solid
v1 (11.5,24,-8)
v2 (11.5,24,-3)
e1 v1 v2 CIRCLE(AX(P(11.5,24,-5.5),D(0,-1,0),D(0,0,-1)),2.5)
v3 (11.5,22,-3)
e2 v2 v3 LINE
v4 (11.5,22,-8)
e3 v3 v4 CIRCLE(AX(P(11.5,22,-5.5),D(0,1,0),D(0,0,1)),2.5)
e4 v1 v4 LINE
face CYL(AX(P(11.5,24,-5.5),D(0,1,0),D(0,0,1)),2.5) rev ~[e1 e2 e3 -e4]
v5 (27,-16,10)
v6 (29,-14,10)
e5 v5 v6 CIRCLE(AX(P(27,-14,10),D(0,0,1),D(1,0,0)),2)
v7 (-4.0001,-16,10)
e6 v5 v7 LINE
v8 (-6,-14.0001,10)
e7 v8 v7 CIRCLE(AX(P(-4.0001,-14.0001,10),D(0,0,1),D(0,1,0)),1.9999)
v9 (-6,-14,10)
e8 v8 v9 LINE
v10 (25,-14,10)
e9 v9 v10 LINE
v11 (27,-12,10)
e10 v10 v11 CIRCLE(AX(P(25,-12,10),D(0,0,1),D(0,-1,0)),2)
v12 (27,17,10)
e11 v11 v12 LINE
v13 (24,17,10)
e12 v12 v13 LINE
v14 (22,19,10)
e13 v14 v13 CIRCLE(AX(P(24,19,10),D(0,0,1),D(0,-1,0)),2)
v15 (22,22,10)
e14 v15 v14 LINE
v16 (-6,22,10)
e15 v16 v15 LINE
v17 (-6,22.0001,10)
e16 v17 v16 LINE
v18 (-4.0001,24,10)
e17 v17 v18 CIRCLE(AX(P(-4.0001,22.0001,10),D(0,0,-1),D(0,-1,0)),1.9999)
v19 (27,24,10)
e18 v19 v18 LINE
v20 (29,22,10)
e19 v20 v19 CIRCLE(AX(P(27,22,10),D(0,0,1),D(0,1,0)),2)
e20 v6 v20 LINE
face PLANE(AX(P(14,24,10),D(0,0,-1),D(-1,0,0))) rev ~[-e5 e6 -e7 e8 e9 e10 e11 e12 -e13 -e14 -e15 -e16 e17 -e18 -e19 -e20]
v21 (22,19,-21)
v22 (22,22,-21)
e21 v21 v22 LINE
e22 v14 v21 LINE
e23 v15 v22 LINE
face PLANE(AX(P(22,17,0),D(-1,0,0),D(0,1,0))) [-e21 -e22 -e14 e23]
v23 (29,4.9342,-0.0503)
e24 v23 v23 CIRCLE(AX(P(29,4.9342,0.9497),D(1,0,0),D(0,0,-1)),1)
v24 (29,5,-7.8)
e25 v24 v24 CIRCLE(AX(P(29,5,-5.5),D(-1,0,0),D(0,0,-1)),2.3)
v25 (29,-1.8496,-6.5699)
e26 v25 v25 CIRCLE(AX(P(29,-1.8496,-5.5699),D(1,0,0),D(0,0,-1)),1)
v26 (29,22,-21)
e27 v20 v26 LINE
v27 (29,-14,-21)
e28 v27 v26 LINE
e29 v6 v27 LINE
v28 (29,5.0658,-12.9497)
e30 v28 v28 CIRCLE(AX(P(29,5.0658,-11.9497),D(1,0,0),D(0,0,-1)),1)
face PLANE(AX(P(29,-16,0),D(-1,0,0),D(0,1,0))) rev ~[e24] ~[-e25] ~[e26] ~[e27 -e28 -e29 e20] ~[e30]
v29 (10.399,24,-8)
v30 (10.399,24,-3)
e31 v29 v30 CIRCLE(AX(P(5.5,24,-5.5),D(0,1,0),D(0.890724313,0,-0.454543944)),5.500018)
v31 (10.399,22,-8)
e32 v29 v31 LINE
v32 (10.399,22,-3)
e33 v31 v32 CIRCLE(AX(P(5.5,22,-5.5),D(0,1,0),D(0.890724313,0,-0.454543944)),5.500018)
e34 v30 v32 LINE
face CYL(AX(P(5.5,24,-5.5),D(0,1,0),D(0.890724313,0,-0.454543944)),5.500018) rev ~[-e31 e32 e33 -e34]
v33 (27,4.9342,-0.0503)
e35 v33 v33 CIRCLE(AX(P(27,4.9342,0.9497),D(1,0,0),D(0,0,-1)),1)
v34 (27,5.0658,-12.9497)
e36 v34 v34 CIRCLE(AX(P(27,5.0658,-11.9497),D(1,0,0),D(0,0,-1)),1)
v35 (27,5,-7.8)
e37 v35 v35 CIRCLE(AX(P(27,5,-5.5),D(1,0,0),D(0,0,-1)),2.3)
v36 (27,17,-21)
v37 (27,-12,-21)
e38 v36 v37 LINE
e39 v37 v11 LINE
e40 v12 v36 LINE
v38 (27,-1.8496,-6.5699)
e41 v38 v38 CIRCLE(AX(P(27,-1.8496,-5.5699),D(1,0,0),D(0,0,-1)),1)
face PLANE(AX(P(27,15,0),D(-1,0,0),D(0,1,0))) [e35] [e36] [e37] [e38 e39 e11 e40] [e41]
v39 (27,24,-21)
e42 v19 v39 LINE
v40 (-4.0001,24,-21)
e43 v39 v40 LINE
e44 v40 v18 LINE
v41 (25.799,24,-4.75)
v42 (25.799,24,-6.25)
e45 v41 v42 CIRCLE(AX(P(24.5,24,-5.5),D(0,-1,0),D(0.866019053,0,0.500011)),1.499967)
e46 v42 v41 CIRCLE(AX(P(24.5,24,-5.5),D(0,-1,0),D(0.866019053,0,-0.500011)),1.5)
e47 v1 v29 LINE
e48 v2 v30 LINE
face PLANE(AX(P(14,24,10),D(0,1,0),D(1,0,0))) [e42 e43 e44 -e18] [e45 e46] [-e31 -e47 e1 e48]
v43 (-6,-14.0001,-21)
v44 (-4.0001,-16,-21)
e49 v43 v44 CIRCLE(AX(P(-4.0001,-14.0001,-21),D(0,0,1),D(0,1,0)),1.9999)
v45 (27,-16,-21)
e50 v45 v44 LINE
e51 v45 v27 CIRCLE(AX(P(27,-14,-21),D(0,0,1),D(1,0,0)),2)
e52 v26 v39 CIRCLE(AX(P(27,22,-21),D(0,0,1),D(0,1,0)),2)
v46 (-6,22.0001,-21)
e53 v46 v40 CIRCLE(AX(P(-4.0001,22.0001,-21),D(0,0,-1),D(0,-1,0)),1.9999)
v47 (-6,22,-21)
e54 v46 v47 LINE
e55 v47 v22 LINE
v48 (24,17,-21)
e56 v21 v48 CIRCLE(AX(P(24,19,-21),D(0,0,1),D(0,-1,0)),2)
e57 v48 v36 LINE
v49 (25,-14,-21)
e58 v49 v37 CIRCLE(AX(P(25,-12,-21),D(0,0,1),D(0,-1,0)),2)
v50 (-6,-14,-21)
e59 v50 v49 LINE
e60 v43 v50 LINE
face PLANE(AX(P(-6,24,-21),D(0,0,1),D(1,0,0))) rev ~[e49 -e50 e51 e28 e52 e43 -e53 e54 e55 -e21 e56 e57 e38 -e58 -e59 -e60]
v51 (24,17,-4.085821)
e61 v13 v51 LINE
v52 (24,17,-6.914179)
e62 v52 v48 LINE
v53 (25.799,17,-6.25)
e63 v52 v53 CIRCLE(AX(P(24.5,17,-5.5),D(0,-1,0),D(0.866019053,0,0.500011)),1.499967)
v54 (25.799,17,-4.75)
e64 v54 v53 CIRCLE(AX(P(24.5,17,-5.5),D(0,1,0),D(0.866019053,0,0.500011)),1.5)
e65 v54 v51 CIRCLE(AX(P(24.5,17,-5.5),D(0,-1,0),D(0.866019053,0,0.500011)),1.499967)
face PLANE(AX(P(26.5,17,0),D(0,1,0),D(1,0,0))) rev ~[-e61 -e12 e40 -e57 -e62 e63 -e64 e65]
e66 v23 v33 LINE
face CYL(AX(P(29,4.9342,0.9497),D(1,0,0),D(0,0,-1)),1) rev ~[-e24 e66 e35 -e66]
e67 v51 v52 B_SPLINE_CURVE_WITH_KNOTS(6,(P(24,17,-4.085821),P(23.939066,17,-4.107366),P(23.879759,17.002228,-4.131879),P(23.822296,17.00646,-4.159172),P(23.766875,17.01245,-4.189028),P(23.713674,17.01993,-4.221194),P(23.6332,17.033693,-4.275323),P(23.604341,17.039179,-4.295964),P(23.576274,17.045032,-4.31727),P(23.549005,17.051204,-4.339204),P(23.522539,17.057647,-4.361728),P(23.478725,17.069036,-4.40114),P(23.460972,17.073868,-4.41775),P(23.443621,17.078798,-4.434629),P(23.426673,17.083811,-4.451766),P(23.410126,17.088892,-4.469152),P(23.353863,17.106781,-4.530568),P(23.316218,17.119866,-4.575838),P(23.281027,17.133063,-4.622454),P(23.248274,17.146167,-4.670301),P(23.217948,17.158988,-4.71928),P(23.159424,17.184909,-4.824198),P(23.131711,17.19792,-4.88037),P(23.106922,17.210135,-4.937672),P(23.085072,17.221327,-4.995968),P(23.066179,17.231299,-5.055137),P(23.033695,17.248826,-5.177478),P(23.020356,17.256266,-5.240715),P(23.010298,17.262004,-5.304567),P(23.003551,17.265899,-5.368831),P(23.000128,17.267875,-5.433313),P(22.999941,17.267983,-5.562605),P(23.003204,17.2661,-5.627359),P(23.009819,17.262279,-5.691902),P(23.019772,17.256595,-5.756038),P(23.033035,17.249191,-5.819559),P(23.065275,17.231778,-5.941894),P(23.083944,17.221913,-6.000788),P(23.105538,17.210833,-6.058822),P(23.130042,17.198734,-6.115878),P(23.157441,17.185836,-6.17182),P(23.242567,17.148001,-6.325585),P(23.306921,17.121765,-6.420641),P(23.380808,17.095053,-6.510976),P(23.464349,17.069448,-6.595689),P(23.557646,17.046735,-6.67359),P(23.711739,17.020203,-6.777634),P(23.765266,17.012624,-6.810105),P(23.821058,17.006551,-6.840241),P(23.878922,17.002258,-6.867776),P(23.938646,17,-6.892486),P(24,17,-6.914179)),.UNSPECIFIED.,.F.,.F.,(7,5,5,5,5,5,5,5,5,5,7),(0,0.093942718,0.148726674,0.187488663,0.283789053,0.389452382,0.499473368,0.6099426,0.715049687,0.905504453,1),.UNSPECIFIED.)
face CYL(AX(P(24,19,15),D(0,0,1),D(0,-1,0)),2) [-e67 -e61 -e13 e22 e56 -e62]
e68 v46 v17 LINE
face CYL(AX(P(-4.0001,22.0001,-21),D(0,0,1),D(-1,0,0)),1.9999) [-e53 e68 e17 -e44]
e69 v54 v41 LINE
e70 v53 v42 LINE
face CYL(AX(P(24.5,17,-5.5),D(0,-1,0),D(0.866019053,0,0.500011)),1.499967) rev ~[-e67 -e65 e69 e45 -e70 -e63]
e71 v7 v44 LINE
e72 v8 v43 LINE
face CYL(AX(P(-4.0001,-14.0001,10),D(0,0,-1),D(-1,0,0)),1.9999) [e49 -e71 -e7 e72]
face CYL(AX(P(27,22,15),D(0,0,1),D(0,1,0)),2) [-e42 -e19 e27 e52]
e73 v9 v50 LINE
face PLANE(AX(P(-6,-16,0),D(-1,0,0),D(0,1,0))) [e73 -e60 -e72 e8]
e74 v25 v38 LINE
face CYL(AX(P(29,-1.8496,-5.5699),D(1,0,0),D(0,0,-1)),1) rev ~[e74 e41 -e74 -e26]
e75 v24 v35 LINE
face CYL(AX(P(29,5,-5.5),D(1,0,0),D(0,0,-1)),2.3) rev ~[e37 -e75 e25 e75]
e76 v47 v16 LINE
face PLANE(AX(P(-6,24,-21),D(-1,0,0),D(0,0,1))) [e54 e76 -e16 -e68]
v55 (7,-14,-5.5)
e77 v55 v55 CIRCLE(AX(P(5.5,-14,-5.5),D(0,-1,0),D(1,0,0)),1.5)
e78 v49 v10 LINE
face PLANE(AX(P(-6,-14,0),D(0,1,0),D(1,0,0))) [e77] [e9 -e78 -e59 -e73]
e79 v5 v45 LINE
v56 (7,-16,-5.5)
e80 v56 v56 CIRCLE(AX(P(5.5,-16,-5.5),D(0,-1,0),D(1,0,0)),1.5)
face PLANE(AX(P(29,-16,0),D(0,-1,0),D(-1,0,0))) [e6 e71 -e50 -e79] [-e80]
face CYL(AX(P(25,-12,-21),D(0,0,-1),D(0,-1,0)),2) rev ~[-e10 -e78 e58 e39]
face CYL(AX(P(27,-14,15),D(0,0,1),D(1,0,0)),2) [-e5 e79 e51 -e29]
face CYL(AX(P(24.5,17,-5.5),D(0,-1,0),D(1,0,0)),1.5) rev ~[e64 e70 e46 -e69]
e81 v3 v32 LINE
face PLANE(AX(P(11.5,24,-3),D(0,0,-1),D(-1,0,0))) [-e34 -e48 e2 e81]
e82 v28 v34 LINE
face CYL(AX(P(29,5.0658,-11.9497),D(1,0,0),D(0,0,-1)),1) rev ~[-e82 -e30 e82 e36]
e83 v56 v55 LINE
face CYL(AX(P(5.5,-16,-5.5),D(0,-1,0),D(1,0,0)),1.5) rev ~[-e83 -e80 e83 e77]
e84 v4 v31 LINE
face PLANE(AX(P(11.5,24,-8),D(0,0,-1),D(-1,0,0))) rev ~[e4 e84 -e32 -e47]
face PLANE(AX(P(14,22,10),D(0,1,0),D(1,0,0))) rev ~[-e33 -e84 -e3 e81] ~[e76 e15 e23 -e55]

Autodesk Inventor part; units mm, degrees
ref_plane "YZ Plane" through (0, 0, 0) normal (1, 0, 0) x (0, 1, 0)
ref_plane "XZ Plane" through (0, 0, 0) normal (0, 1, 0) x (-1, 0, 0)
ref_plane "Work Plane1" through (0, 0, 0) normal (0, 0, 1) x (1, 0, 0)
sketch "Sketch1" plane through (0, 0, 0) normal (0, 0, 1) x (1, 0, 0)
  line L0 (27, 15) -> (27, 17) projected
  line L1 (21.5, 17) -> (26.5, 17) construction
  line L2 (22, 17) -> (22, 21.5) projected
  line L3 (27, 15) -> (27, 17) projected
  line L4 (21.5, 17) -> (26.5, 17) projected
  line L5 (21.5, 22) -> (7.7913, 22) projected
  line L6 (14, 22) -> (14, 26.5) construction
  line L7 (27, 15) -> (27, 17)
  line L8 (22, 17) -> (27, 17)
  line L9 (22, 17) -> (22, 21.5)
  line L10 (21.5, 22) -> (22, 22)
  line L11 (22, 22) -> (22, 21.5)
  line L12 (21.5, 22) -> (14, 22)
  line L13 (11.5, 27) -> (13.5, 27) projected
  line L14 (7.7913, 22) -> (21.5, 22) projected
  line L15 (27, 15) -> (27, 0)
  line L16 (14, 22) -> (14, 24)
  line L17 (14, 24) -> (27, 24)
  line L18 (27, 24) -> (29, 24)
  line L19 (29, -16) -> (29, 24)
  line L20 (29, -16) -> (-6, -16)
  line L21 (-6, -16) -> (-6, -14)
  line L22 (-6, -14) -> (27, -14)
  line L23 (27, -14) -> (27, 0)
  point P0 (0, 0)
  dimension "d0" = 2
  dimension "d1" = 2
  dimension "d2" = 40
  dimension "d3" = 35
  dimension "d4" = 2
extrude "Extrusion1" add sketch "Sketch1" along normal blind 10 and the other way blind 21
sketch "Sketch2" plane through (14, 24, 10) normal (0, 1, 0) x (1, 0, 0)
  arc A0 (-3.601, 18) -> (-3.601, 13) centre (-8.5, 15.5) ccw projected
  arc A1 (-3.601, 18) -> (-3.601, 13) centre (-8.5, 15.5) ccw
  arc A2 (-2.5, 13) -> (-2.5, 18) centre (-2.5, 15.5) ccw projected
  line L0 (-2.5, 13) -> (-3.601, 13) projected
  line L1 (-2.5, 18) -> (-3.601, 18) projected
  arc A3 (-2.5, 13) -> (-2.5, 18) centre (-2.5, 15.5) ccw
  line L2 (-3.601, 13) -> (-2.5, 13)
  line L3 (-3.601, 18) -> (-2.5, 18)
  line L4 (0.5, 15.5) -> (0.5, 0)
  line L5 (15, 0) -> (0, 0) projected
  line L6 (0.5, 15.5) -> (0.5, 31)
  line L7 (0, 31) -> (0, 0) projected
  line L8 (13, 0) -> (-20, 0) projected
  line L9 (0.5, 0) -> (-20, 0)
  line L10 (-20, 31) -> (-20, 0) projected
  line L11 (-20, 0) -> (-20, 31)
  line L12 (-20, 31) -> (0.5, 31)
  point P0 (-14, 10)
  point P1 (0, 15.5)
extrude "Extrusion2" add sketch "Sketch2" against normal blind 2 contours L7 L8 L10 L12
sketch "Sketch3" plane through (22, 17, 10) normal (0, -1, 0) x (1, 0, 0)
  arc A0 (3.799, -14.75) -> (3.799, -16.25) centre (2.5, -15.5) ccw projected
  circle A1 centre (2.5, -15.5) radius 1.5
  point P0 (-22, -10)
  point P1 (3.799, -16.25)
  point P2 (3.799, -14.75)
extrude "Extrusion3" cut sketch "Sketch3" against normal blind 17
sketch "Sketch4" plane through (29, -16, 10) normal (1, 0, 0) x (0, 0, -1)
  line L0 (13, 40) -> (18, 40) projected
  line L1 (15.5, 40) -> (15.5, 21)
  circle A0 centre (15.5, 21) radius 2.3
  point P0 (10, 16)
  dimension "d15" = 19
  dimension "d16" = 4.6
extrude "Extrusion4" cut sketch "Sketch4" against normal blind 2
sketch "Sketch5" plane through (29, -16, 10) normal (1, 0, 0) x (0, 0, -1)
  circle A0 centre (21.9497, 21.0658) radius 0.6
  circle A1 centre (9.0503, 20.9342) radius 0.6
  circle A2 centre (15.4342, 27.4497) radius 0.6
  circle A3 centre (15.5699, 14.1504) radius 0.6
  circle A4 centre (15.4342, 27.4497) radius 1
  circle A5 centre (21.9497, 21.0658) radius 1
  circle A6 centre (15.5699, 14.1504) radius 1
  circle A7 centre (9.0503, 20.9342) radius 1
  point P0 (10, 16)
  dimension "d19" = 2
  dimension "d20" = 2
  dimension "d21" = 2
  dimension "d22" = 2
extrude "Extrusion5" cut sketch "Sketch5" against normal blind 2.1 contours A0 | A1 | A3 | A5 | A6 | A7
fillet "Fillet1" radius 2 4 edges at (27, -14, -5.5) (22, 17, -5.5) (29, 24, -5.5) (29, -16, -5.5)
fillet "Fillet2" radius 2 2 edges at (-6, -16, -5.5) (-6, 24, -5.5)
sketch "Sketch6" plane through (27, -16, -21) normal (0, -1, 0) x (1, 0, 0)
  circle A0 centre (-21.5, 15.5) radius 1.5
  circle A1 centre (-21.5, 15.5) radius 1.5
  point P0 (-27, 21)
extrude "Extrusion6" cut sketch "Sketch6" against normal blind 3
